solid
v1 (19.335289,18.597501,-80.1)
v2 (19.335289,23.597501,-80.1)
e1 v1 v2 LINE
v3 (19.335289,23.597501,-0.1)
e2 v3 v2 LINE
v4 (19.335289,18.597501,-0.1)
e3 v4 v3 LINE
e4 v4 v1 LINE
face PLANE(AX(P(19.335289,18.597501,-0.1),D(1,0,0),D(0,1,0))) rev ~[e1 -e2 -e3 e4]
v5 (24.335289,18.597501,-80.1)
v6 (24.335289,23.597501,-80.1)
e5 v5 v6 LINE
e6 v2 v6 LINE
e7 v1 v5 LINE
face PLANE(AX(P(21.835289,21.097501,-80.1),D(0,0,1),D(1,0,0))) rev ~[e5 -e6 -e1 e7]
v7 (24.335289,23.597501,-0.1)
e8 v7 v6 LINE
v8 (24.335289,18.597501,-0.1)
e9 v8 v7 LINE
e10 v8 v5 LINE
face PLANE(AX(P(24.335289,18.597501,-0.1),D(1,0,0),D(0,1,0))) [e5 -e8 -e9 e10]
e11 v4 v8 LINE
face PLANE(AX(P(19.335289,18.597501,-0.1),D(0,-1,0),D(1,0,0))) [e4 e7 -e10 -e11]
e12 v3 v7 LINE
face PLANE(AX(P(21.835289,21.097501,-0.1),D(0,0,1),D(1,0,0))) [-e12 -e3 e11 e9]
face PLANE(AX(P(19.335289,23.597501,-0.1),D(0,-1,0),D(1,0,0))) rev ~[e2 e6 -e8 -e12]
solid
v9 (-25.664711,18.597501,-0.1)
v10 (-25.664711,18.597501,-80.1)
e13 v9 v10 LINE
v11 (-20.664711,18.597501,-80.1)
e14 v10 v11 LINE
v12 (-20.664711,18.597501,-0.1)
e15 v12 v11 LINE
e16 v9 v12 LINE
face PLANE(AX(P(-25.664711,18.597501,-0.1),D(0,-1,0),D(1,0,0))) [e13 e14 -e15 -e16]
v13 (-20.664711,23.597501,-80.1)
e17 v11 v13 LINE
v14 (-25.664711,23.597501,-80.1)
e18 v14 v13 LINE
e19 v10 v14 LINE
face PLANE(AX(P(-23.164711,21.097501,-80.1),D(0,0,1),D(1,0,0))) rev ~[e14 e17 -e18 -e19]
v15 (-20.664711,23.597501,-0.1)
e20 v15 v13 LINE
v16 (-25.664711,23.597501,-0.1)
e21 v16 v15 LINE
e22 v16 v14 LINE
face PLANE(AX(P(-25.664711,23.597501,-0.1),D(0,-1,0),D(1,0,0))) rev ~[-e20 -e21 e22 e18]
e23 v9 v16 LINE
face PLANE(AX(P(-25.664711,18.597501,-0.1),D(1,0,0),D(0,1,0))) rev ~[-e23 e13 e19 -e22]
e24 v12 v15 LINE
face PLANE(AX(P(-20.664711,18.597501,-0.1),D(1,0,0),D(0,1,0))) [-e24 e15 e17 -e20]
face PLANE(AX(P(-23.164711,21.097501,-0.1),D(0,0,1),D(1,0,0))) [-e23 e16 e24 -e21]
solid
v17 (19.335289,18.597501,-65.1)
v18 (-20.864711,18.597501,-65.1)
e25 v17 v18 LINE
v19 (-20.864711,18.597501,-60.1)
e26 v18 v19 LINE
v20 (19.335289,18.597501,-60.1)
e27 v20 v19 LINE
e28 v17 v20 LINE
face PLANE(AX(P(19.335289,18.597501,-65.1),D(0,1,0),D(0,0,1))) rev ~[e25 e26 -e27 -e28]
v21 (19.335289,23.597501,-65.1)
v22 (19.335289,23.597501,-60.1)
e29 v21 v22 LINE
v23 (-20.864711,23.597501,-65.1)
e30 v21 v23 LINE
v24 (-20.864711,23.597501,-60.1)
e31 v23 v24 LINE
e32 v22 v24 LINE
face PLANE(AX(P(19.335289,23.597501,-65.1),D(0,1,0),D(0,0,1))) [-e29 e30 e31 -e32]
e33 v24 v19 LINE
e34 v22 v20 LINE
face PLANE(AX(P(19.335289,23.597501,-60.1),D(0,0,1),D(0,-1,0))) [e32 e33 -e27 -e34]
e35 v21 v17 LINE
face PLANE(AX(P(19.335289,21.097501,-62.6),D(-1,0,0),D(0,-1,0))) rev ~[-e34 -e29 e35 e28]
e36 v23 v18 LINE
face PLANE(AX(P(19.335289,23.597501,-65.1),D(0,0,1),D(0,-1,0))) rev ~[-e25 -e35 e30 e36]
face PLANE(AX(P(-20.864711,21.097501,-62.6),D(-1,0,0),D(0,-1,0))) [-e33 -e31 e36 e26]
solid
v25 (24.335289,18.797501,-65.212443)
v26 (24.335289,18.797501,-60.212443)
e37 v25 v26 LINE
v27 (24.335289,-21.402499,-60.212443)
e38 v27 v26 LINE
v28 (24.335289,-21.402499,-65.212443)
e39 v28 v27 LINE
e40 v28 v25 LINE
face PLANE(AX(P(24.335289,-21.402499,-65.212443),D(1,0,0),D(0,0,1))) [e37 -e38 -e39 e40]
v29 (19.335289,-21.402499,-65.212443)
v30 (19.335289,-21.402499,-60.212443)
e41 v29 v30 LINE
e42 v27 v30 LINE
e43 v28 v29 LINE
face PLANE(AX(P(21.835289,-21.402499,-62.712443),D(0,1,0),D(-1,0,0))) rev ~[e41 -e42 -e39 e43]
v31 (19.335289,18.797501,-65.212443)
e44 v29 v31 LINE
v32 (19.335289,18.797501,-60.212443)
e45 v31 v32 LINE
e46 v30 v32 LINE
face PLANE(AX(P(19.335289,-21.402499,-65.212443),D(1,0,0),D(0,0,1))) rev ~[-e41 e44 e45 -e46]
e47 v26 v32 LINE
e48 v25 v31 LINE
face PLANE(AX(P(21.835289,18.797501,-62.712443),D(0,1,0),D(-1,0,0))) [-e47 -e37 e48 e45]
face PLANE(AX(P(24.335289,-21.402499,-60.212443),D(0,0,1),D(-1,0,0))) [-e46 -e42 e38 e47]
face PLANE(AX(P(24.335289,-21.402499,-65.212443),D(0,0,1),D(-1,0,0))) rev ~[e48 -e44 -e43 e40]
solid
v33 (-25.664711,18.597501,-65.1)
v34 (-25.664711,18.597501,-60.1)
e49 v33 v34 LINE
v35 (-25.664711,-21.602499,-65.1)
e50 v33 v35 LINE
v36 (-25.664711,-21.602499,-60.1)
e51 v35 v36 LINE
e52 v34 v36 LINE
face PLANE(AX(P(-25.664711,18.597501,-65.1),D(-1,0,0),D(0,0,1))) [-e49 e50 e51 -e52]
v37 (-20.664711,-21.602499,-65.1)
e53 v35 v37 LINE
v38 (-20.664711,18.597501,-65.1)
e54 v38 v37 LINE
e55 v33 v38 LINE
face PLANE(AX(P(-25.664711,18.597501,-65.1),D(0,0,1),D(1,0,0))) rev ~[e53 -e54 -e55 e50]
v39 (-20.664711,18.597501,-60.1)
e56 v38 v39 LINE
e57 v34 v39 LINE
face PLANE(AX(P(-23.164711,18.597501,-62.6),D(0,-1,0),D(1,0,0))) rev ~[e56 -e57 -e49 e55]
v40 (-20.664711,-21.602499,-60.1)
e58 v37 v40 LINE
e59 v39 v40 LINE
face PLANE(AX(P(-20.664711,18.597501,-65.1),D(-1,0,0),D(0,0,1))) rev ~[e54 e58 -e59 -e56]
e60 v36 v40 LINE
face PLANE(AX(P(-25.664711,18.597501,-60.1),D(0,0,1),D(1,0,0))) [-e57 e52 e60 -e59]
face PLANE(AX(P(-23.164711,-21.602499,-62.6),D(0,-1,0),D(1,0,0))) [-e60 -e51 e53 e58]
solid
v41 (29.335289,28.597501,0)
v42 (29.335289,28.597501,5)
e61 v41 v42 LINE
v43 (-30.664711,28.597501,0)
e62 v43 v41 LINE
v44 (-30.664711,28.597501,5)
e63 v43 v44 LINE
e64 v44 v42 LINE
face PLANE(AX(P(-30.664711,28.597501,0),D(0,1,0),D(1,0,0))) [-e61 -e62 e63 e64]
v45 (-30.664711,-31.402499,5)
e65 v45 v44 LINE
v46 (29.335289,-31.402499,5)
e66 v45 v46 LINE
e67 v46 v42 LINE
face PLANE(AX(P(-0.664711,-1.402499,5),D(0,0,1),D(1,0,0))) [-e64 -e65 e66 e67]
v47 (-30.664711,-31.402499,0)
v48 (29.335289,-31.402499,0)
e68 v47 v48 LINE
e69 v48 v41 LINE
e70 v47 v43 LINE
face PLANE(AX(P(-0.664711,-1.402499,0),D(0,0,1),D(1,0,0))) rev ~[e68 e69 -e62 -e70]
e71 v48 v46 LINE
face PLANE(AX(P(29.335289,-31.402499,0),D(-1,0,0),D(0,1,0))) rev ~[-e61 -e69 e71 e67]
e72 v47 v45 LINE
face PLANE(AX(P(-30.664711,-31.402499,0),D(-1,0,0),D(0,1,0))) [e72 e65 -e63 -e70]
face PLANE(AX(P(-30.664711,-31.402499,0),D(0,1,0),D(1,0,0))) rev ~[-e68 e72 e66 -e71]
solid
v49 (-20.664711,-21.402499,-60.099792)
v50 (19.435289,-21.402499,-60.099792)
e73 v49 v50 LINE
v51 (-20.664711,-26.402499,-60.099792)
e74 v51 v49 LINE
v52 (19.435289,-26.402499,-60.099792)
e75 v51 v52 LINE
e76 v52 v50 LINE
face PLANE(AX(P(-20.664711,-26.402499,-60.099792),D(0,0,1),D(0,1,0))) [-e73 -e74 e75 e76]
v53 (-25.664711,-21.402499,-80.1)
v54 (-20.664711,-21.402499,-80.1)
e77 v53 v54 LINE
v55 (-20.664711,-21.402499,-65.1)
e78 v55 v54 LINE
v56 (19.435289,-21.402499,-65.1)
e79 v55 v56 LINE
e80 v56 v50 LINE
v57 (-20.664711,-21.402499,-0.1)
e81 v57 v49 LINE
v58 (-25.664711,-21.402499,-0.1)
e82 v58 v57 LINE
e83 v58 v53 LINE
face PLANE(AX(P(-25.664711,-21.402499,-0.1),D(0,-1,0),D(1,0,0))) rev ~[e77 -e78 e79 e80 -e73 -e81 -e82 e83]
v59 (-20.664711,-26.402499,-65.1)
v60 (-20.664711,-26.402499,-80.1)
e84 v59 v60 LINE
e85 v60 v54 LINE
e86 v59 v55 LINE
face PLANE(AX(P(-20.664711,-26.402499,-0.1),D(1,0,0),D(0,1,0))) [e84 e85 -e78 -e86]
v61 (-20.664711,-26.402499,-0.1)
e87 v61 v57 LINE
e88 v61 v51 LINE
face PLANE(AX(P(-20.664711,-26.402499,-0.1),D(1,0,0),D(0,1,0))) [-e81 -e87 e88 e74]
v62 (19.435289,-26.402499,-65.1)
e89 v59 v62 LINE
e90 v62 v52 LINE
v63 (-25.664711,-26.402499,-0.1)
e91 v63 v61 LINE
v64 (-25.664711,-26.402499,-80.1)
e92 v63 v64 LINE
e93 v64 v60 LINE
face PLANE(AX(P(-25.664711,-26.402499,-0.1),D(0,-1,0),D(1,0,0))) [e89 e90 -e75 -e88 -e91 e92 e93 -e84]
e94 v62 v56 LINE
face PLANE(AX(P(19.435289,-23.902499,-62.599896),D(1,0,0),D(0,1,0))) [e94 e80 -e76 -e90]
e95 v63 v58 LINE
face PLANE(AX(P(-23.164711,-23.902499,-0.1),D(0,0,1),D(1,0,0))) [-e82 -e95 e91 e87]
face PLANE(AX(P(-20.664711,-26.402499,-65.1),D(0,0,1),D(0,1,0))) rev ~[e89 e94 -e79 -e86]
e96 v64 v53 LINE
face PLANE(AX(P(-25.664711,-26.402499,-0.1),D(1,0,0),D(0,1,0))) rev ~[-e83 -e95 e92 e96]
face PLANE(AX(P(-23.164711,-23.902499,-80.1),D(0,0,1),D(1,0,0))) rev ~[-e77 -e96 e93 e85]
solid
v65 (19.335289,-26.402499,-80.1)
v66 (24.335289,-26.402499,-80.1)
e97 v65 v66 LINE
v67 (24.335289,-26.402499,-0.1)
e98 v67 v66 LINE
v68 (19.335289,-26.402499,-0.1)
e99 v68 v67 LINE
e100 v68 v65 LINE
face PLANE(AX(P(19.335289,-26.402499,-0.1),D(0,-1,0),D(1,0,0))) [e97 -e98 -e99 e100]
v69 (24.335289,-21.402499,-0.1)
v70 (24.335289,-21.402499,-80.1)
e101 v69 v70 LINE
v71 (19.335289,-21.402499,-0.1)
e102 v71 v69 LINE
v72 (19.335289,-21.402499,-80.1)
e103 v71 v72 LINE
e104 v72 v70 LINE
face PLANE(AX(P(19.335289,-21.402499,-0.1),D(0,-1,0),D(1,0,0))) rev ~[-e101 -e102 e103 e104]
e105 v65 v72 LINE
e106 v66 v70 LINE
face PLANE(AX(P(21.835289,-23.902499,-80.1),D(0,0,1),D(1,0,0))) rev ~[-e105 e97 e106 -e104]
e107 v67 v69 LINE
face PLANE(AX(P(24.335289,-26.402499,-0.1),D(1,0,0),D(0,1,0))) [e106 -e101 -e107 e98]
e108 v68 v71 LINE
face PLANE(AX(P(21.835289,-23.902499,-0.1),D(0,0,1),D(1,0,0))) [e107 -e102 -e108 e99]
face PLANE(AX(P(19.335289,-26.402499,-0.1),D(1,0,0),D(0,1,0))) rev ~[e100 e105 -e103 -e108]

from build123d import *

# Parameters (mm, degrees)
F0_W      = 60
F0_H      = 60
F1_DEPTH  = 5
F3_W      = 5
F3_H      = 5
F4_DEPTH  = 80
F5_DEPTH  = 80
F6_DEPTH  = 80
F7_W      = 5
F7_H      = 5.0002082646
F8_DEPTH  = 40.1
F9_W      = 5
F9_H      = 5
F10_DEPTH = 40.2
F11_W     = 5
F11_H     = 5
F12_DEPTH = 40.2
F13_W     = 5
F13_H     = 5
F14_DEPTH = 40.2


with BuildPart() as f1:
    # F0 (on Top) → F1 (new body)
    with BuildSketch(Plane.XY):
        with Locations((-0.6647109985, -1.4024986219)):
            Rectangle(F0_W, F0_H)
    extrude(amount=F1_DEPTH)


with BuildPart() as f4:
    # F3 (on offset) → F4 (new body)
    with BuildSketch(Plane.XY.offset(-0.1)):
        with Locations((-23.1647109985, -23.9024986219)):
            Rectangle(F3_W, F3_H)
    extrude(amount=-F4_DEPTH)

    # F7 (on face) → F8 (join)
    with BuildSketch(Plane.YZ.offset(-20.6647109985)):
        with Locations((-23.9024986219, -62.5998958677)):
            Rectangle(F7_W, F7_H)
    extrude(amount=F8_DEPTH)


with BuildPart() as f5:
    # F3 (on offset) → F5 (new body)
    with BuildSketch(Plane.XY.offset(-0.1)):
        with Locations((21.8352890015, -23.9024986219)):
            Rectangle(F3_W, F3_H)
    extrude(amount=-F5_DEPTH)


with BuildPart() as f6:
    # F3 (on offset) → F6 (new body)
    with BuildSketch(Plane.XY.offset(-0.1)):
        with Locations((21.8352890015, 21.0975013781)):
            Rectangle(F3_W, F3_H)
    extrude(amount=-F6_DEPTH)


with BuildPart() as f6b:
    # F3 (on offset) → F6, piece 2 (new body)
    with BuildSketch(Plane.XY.offset(-0.1)):
        with Locations((-23.1647109985, 21.0975013781)):
            Rectangle(F3_W, F3_H)
    extrude(amount=-F6_DEPTH)


with BuildPart() as f10:
    # F9 (on face) → F10 (new body)
    with BuildSketch(Plane(origin=(0, -21.4024986219, 0), x_dir=(-1, 0, 0), z_dir=(0, 1, 0))):
        with Locations((-21.8352890015, -62.712443471)):
            Rectangle(F9_W, F9_H)
    extrude(amount=F10_DEPTH)


with BuildPart() as f12:
    # F11 (on face) → F12 (new body)
    with BuildSketch(Plane(origin=(19.3352890015, 0, 0), x_dir=(0, -1, 0), z_dir=(-1, 0, 0))):
        with Locations((-21.0975013781, -62.6)):
            Rectangle(F11_W, F11_H)
    extrude(amount=F12_DEPTH)


with BuildPart() as f14:
    # F13 (on face) → F14 (new body)
    with BuildSketch(Plane.XZ.offset(-18.5975013781)):
        with Locations((-23.1647109985, -62.6)):
            Rectangle(F13_W, F13_H)
    extrude(amount=F14_DEPTH)


solid = Compound([f1.part, f4.part, f5.part, f6.part, f6b.part, f10.part, f12.part, f14.part])
